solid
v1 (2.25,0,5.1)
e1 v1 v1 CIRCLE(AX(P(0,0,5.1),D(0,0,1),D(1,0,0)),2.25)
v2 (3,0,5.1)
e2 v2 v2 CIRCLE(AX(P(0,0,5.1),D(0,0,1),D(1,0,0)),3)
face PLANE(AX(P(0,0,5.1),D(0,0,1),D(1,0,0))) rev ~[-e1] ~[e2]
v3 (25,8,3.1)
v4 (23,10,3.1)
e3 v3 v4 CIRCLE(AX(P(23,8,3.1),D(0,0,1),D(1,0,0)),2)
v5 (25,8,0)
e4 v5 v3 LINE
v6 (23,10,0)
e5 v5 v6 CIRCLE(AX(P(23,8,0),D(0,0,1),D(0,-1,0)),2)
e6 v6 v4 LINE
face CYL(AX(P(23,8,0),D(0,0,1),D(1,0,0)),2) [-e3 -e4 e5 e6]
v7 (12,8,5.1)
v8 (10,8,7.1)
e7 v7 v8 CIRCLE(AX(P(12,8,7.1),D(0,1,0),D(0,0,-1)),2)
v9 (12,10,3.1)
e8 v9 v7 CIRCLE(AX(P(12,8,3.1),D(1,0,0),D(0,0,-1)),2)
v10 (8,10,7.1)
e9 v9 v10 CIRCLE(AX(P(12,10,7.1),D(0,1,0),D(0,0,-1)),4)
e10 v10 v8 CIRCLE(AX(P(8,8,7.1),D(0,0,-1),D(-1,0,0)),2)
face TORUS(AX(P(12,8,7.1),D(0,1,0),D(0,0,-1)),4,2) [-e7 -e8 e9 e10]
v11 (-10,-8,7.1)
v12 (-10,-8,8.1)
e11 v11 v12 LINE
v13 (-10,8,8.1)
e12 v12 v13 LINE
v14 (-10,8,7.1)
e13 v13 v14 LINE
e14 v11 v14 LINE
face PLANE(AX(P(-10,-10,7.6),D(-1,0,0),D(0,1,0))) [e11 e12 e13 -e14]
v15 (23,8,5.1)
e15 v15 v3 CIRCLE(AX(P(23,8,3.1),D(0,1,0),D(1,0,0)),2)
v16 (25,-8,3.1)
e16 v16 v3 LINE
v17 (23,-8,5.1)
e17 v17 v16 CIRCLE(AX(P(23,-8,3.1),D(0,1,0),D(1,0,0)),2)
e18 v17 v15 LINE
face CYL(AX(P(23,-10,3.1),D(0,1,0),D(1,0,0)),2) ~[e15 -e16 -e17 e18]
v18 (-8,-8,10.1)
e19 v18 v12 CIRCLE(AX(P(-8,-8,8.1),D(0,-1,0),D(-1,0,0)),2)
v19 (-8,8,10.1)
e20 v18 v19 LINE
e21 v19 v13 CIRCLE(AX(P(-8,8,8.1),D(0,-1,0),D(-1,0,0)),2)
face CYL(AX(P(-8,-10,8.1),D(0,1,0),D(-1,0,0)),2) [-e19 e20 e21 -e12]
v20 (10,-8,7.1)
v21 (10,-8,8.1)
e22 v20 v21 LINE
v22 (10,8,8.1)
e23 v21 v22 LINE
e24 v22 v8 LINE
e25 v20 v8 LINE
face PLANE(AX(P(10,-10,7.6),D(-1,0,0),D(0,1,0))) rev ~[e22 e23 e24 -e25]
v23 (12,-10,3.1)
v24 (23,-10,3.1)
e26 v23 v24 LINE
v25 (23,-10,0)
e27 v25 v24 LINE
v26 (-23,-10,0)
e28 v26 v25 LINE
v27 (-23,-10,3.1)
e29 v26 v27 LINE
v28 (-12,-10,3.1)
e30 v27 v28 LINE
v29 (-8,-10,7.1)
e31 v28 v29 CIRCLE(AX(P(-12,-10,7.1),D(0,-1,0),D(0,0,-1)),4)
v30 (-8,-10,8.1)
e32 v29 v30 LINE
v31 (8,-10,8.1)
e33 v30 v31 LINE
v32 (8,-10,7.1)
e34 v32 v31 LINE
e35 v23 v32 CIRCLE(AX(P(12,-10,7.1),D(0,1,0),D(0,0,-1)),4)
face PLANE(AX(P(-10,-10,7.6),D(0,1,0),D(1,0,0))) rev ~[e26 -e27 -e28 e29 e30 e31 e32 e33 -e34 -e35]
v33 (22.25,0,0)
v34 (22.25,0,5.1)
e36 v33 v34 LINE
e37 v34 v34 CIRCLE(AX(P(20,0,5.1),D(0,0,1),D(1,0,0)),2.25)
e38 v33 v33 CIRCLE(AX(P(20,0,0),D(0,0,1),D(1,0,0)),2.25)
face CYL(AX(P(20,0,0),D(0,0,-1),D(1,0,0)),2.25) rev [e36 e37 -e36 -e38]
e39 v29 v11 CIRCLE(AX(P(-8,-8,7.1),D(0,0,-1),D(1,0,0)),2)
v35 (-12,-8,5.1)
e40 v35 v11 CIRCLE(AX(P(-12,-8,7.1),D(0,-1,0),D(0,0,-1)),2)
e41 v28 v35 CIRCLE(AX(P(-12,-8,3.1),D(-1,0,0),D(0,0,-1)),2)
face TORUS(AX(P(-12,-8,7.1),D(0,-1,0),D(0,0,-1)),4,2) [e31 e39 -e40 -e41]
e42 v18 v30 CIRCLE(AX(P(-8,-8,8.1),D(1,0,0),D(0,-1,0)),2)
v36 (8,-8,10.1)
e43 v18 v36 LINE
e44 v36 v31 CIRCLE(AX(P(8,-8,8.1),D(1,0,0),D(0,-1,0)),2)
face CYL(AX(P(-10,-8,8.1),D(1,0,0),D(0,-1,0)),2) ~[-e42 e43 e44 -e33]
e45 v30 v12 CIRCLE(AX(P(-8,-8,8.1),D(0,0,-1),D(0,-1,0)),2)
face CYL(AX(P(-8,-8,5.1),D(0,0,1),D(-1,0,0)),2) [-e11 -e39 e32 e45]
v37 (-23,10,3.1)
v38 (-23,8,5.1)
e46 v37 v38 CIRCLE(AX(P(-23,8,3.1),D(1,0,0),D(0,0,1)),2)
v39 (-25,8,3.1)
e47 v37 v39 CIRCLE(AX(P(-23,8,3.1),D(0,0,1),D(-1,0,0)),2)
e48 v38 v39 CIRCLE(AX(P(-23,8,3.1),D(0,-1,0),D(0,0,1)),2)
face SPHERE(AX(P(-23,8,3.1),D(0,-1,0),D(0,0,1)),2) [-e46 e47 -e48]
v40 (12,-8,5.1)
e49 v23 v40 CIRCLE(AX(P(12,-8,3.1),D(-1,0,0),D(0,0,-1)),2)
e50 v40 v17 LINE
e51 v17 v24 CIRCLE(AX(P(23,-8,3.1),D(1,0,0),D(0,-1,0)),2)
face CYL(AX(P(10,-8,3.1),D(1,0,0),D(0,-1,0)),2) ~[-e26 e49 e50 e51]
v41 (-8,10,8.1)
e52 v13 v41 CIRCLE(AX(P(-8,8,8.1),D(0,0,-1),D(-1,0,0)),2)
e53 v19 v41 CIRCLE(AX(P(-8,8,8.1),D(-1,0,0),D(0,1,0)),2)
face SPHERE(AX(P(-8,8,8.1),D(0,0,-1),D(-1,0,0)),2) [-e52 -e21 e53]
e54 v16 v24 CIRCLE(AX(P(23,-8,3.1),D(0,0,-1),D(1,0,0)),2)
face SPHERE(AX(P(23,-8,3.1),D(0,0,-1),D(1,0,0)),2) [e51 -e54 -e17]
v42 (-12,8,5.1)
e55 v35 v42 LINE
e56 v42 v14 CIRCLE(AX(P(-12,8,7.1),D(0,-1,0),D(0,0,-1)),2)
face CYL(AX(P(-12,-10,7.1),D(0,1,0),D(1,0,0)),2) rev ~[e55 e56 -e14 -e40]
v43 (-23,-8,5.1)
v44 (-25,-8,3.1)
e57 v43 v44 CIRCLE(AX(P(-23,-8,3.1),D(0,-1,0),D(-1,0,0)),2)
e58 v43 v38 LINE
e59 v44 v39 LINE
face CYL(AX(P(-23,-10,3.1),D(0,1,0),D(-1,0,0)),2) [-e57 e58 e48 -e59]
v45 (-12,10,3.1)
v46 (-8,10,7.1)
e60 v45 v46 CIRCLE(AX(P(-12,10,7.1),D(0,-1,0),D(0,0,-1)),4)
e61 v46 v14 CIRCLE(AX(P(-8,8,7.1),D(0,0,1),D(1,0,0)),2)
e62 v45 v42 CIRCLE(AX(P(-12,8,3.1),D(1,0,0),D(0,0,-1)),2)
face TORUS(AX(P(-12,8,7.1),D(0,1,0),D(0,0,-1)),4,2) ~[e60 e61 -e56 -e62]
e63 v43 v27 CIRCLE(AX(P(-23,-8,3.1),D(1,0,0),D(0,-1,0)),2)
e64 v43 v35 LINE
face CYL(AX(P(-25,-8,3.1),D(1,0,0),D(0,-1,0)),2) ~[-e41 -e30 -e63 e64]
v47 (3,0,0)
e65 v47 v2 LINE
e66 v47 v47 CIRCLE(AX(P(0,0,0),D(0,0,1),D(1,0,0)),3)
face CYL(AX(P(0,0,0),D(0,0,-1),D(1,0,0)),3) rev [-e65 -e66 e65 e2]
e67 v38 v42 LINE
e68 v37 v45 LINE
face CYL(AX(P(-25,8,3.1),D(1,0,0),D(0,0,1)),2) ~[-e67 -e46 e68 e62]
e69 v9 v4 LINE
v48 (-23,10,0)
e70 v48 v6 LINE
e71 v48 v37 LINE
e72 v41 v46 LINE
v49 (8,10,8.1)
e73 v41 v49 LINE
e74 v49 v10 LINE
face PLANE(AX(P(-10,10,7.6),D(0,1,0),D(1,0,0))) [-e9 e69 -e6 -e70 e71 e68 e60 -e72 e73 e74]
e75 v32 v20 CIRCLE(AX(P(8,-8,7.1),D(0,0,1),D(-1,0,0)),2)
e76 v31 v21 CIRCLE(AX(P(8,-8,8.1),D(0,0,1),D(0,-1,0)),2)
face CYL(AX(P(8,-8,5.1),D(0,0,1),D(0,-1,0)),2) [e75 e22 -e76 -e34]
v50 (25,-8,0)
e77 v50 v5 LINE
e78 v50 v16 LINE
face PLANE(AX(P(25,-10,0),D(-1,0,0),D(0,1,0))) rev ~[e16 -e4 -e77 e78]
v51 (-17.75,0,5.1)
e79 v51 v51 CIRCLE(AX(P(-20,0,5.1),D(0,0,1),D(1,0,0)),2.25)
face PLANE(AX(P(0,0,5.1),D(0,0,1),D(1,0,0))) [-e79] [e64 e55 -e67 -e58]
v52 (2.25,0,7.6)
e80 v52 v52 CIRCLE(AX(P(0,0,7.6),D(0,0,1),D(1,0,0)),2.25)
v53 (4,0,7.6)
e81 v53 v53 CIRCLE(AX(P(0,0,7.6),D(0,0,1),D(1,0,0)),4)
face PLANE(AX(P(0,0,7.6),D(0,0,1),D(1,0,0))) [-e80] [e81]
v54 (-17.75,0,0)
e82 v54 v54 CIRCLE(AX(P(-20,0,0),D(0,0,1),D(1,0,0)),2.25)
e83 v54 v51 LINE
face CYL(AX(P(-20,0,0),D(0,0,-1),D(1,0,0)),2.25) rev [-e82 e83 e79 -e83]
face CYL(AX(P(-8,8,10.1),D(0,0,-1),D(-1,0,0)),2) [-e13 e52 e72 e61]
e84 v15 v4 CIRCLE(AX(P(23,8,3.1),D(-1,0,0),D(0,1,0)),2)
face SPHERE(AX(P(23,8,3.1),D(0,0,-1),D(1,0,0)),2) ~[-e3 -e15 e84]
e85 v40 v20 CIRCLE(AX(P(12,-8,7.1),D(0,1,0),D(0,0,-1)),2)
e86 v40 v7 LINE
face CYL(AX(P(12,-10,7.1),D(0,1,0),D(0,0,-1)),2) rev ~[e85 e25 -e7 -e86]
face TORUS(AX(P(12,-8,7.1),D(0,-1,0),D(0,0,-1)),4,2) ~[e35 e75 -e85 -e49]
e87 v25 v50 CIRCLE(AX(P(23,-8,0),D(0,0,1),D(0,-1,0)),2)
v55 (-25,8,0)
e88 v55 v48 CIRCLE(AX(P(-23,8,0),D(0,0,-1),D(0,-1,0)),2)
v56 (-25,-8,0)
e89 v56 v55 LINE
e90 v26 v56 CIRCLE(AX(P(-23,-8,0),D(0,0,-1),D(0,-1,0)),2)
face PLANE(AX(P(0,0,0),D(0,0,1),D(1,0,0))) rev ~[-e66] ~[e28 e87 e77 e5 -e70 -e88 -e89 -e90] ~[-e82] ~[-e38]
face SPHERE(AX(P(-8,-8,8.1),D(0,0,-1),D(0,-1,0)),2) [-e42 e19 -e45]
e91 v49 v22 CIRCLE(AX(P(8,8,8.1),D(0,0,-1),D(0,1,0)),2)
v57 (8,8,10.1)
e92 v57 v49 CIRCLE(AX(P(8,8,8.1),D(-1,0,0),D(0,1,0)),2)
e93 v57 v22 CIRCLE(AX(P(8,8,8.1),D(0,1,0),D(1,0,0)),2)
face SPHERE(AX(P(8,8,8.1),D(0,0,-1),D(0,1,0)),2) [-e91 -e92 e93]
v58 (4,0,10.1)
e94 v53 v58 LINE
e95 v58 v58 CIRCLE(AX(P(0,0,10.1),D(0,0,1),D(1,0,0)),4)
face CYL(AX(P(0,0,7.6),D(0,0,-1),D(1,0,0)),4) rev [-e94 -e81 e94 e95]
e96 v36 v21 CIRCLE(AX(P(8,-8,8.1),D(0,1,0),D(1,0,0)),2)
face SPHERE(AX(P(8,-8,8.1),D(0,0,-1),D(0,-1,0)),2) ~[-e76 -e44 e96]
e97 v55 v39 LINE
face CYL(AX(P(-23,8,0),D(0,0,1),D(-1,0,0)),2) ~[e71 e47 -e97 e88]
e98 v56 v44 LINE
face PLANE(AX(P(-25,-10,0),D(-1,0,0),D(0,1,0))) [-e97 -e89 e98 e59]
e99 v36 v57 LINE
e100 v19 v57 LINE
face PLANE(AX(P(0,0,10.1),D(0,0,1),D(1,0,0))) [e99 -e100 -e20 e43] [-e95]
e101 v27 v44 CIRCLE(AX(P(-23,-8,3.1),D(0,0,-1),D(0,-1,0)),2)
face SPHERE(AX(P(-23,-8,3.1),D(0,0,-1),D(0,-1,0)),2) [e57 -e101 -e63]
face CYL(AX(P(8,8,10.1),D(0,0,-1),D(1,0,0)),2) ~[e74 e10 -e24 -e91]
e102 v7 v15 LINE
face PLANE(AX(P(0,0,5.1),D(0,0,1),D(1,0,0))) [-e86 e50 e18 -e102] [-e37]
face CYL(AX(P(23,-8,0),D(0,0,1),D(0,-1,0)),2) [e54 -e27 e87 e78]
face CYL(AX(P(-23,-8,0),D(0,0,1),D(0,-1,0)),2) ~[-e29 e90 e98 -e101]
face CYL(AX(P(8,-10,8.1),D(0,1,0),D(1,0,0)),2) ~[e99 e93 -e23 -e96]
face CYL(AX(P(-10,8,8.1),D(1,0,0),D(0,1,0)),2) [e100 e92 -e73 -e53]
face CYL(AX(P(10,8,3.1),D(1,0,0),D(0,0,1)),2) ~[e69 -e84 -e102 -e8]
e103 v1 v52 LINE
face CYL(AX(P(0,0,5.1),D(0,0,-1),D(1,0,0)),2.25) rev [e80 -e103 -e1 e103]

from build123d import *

# Parameters (mm, degrees)
F0_W     = 50
F0_H     = 20
F0_R     = 2.25
F0_R_2   = 4
F0_R_3   = 3
F1_DEPTH = 5.1
F2_W     = 20
F2_H     = 20
F2_R     = 3
F2_R_2   = 2.25
F3_DEPTH = 2.5
F4_W     = 20
F4_H     = 20
F4_R     = 4
F5_DEPTH = 2.5
F6_R     = 2


# Not quite as in the source:
# - a feature names something its author has since deleted; it is built from what else it names


with BuildPart() as f1:
    # F0 (on Top) → F1 (new body)
    with BuildSketch(Plane.XY):
        Rectangle(F0_W, F0_H)
        with Locations((-20, 0)):
            Circle(F0_R, mode=Mode.SUBTRACT)
        Circle(F0_R_2, mode=Mode.SUBTRACT)
        with Locations((20, 0)):
            Circle(F0_R, mode=Mode.SUBTRACT)
        Circle(F0_R_2)
        Circle(F0_R_3, mode=Mode.SUBTRACT)
    extrude(amount=F1_DEPTH)

    # F2 (on face) → F3 (join)
    with BuildSketch(Plane.XY.offset(5.1)):
        Rectangle(F2_W, F2_H)
        Circle(F2_R, mode=Mode.SUBTRACT)
        Circle(F2_R)
        Circle(F2_R_2, mode=Mode.SUBTRACT)
    extrude(amount=F3_DEPTH)

    # F4 (on face) → F5 (join)
    with BuildSketch(Plane.XY.offset(7.6)):
        Rectangle(F4_W, F4_H)
        Circle(F4_R, mode=Mode.SUBTRACT)
    extrude(amount=F5_DEPTH)

    # F6
    f6_edges = [f1.edges().sort_by_distance(p)[0] for p in [
        (-25, -10, 2.55),
        (25, -10, 2.55),
        (25, 10, 2.55),
        (25, 0, 5.1),
        (17.5, -10, 5.1),
        (17.5, 10, 5.1),
        (-17.5, -10, 5.1),
        (-25, 0, 5.1),
        (-17.5, 10, 5.1),
        (-25, 10, 2.55),
        (10, -10, 7.6),
        (10, 10, 7.6),
        (-10, -10, 7.6),
        (-10, 10, 7.6),
        (10, 0, 5.1),
        (-10, 0, 5.1),
        (0, -10, 10.1),
        (-10, 0, 10.1),
        (0, 10, 10.1),
        (10, 0, 10.1),
    ]]
    fillet(f6_edges, radius=F6_R)


solid = f1.part
